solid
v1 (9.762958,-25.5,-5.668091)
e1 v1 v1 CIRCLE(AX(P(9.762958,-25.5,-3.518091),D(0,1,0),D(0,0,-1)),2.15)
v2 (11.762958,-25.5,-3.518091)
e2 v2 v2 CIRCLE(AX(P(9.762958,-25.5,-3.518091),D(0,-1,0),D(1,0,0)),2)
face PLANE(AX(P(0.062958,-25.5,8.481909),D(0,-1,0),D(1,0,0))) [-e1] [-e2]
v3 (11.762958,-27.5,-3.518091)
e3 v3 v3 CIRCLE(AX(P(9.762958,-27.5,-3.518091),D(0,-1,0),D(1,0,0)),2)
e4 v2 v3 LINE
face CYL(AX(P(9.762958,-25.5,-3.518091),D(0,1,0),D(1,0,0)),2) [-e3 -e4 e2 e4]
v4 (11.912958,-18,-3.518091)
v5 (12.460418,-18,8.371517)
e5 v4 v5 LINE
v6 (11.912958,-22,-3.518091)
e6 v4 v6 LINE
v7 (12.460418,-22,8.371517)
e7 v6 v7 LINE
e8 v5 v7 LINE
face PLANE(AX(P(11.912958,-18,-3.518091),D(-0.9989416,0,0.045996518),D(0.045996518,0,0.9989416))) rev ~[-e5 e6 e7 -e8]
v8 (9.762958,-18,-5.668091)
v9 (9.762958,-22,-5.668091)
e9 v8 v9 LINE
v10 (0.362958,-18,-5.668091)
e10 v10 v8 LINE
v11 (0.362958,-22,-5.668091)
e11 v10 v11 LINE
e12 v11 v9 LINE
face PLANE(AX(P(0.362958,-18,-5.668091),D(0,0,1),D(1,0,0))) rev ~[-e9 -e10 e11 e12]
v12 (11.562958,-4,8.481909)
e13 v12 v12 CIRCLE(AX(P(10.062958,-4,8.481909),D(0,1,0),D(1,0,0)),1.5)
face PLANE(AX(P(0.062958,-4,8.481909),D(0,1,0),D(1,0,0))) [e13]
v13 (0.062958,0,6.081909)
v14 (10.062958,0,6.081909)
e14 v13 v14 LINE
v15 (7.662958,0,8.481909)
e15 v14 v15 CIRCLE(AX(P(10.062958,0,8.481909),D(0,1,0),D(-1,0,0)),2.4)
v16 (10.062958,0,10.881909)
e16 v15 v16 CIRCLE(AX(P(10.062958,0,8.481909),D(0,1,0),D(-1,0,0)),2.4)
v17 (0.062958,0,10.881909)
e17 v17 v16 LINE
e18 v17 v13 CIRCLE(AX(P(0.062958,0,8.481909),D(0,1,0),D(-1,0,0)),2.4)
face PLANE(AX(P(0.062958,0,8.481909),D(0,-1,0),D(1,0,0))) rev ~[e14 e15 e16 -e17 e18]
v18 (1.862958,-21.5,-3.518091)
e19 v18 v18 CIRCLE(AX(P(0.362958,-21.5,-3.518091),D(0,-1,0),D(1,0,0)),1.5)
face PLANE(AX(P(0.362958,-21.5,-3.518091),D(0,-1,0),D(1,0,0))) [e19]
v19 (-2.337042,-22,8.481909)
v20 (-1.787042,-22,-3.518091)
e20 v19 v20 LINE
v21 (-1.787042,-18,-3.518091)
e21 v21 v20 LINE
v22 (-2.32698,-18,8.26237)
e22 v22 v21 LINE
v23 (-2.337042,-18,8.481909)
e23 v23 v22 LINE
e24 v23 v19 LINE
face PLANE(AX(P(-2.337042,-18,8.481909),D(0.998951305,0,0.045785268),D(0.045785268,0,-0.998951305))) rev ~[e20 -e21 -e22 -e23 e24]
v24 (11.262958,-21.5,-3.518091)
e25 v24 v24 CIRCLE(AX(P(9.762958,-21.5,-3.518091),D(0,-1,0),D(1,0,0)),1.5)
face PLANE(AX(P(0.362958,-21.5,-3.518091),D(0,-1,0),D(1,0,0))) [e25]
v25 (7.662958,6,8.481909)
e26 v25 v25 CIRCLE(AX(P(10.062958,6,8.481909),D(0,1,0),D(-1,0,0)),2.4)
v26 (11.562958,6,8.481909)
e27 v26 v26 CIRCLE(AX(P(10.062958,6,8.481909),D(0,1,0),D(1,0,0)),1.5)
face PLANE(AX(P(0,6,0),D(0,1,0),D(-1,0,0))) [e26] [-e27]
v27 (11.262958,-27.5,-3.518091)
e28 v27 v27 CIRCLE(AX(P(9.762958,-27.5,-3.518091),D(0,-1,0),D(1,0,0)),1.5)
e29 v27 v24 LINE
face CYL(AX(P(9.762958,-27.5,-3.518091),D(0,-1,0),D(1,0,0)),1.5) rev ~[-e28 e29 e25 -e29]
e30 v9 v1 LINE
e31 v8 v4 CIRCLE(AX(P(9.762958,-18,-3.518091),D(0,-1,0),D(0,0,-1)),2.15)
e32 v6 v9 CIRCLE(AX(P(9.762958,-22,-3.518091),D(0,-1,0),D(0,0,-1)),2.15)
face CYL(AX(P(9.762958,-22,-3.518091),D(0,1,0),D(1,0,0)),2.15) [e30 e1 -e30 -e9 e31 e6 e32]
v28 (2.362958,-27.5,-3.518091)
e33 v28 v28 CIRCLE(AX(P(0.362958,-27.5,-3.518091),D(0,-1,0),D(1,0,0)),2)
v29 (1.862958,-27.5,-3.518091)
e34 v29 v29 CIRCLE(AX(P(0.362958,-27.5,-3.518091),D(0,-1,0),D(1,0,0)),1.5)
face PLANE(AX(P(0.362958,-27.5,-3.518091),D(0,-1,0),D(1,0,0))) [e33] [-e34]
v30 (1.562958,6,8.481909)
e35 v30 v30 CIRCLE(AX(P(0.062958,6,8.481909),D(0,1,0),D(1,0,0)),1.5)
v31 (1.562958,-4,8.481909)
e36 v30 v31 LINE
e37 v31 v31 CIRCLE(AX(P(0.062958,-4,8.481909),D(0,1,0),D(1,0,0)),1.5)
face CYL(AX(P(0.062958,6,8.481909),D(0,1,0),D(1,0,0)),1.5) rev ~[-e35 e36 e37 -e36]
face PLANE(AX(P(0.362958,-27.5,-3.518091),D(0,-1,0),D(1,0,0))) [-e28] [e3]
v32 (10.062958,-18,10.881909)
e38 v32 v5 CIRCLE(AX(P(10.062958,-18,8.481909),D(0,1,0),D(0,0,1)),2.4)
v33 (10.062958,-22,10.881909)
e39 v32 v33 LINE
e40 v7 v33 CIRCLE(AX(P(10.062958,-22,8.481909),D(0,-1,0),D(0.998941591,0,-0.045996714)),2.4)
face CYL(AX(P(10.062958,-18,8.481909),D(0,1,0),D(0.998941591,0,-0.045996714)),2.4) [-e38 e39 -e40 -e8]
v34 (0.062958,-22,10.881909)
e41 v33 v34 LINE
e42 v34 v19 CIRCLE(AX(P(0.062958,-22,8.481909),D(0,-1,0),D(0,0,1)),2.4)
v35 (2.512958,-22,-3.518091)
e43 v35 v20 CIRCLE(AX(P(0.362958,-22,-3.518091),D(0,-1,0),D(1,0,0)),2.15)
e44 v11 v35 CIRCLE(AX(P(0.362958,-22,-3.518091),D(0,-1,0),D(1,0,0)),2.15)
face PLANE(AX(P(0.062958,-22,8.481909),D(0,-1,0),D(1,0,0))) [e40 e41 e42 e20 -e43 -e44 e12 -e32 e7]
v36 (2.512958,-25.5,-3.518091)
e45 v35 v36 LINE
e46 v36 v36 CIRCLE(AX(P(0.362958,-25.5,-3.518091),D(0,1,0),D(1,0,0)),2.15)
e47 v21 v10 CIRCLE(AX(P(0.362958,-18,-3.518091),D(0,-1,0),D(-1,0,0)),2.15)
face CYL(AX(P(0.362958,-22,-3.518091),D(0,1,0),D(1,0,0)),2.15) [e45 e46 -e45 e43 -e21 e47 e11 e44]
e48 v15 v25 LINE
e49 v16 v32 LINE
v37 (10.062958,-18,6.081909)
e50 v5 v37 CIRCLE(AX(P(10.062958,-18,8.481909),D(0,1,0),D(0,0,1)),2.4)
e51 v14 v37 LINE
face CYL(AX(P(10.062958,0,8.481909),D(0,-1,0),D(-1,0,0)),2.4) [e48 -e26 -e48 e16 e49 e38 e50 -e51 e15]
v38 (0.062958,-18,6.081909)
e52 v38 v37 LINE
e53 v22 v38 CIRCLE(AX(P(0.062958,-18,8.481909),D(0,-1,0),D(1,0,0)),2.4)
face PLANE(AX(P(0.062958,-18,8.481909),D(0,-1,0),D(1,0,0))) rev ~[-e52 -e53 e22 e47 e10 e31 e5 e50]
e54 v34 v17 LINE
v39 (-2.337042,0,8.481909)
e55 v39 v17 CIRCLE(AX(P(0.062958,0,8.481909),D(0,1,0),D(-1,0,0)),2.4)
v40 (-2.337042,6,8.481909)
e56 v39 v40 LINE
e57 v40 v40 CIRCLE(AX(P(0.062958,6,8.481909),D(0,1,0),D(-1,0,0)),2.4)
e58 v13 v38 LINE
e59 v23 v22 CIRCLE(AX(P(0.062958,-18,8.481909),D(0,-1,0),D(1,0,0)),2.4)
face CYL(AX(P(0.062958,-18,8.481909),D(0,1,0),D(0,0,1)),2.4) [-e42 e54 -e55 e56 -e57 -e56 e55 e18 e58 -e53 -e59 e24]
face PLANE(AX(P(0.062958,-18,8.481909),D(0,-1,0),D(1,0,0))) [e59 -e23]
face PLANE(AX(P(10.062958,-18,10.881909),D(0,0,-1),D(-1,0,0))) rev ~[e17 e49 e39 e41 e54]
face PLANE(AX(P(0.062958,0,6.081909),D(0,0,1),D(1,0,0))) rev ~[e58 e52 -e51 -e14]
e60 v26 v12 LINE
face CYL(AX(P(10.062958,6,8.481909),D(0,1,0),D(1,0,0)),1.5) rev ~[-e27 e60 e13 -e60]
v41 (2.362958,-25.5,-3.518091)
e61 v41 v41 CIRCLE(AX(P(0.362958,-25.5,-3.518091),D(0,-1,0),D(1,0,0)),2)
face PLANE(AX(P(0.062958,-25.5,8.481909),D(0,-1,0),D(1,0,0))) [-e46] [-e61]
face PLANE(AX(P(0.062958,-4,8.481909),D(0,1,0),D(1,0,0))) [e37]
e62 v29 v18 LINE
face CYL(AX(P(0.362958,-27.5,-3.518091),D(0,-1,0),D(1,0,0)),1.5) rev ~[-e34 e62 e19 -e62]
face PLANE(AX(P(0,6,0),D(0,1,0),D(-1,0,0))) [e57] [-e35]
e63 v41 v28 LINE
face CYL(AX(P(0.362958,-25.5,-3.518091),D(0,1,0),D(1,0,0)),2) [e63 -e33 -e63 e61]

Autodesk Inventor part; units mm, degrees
ref_plane "YZ Plane" through (0, 0, 0) normal (1, 0, 0) x (0, 1, 0)
ref_plane "XZ Plane" through (0, 0, 0) normal (0, 1, 0) x (-1, 0, 0)
ref_plane "XY Plane" through (0, 0, 0) normal (0, 0, 1) x (1, 0, 0)
sketch "Sketch1" plane through (0, 0, 0) normal (0, 1, 0) x (-1, 0, 0)
  circle A0 centre (-0.062958, 8.481909) radius 2.4
  circle A1 centre (-0.362958, -3.518091) radius 2.15
  circle A2 centre (-10.062958, 8.481909) radius 2.4
  circle A3 centre (-9.762958, -3.518091) radius 2.15
  point P0 (0, 0)
  dimension "d0" = 4.8
  dimension "d1" = 4.3
  dimension "d3" = 4.8
  dimension "d5" = 4.3
  dimension "d24" = 10
  dimension "d25" = 0.3
  dimension "d26" = 0.3
extrude "Extrusion1" add sketch "Sketch1" along normal blind 6 contours A0 | A2
sketch "Sketch2" plane through (0.062958, 0, 8.481909) normal (0, -1, 0) x (1, 0, 0)
  circle A0 centre (0.3, -12) radius 2.15
  circle A1 centre (9.7, -12) radius 2.15
  circle A2 centre (10, 0) radius 2.4
  circle A3 centre (0, 0) radius 2.4
  line L0 (-2.4, 0) -> (-1.85, -12)
  line L1 (0.3, -14.15) -> (9.7, -14.15)
  line L2 (11.85, -12) -> (12.39746, -0.110392)
  line L3 (0, 2.4) -> (10, 2.4)
  point P0 (-0.062958, -8.481909)
sketch "Sketch3" plane through (0.062958, 0, 8.481909) normal (0, -1, 0) x (1, 0, 0)
  circle A0 centre (10, 0) radius 2.4
  circle A1 centre (0, 0) radius 2.4
  line L0 (0, -2.4) -> (10, -2.4)
  line L1 (0, -2.4) -> (10, -2.4)
  circle A2 centre (0, 0) radius 2.4
  circle A3 centre (10, 0) radius 2.4
  circle A4 centre (10, 0) radius 2.4
  circle A5 centre (0, 0) radius 2.4
  circle A6 centre (0, 0) radius 2.4
  circle A7 centre (0, 0) radius 2.4
  circle A8 centre (0, 0) radius 2.4
  circle A9 centre (10, 0) radius 2.4
  circle A10 centre (10, 0) radius 2.4
  circle A11 centre (10, 0) radius 2.4
  circle A12 centre (10, 0) radius 2.4
  circle A13 centre (0, 0) radius 2.4
  circle A14 centre (10, 0) radius 2.4
  circle A15 centre (10, 0) radius 2.4
  circle A16 centre (0, 0) radius 2.4
  line L2 (0, 2.4) -> (10, 2.4)
  point P0 (-0.062958, -8.481909)
  point P1 (-2.4, 0)
  point P2 (12.39746, -0.110392)
extrude "Extrusion2" add sketch "Sketch3" along normal blind 18
sketch "Sketch4" plane through (0.062958, -18, 8.481909) normal (0, -1, 0) x (1, 0, 0)
  circle A0 centre (0.3, -12) radius 2.15
  circle A1 centre (9.7, -12) radius 2.15
  circle A2 centre (0, 0) radius 2.4
  circle A3 centre (10, 0) radius 2.4
  arc A4 (0, -2.4) -> (0, 2.4) centre (0, 0) ccw
  arc A5 (10, 2.4) -> (10, -2.4) centre (10, 0) ccw
  arc A6 (0, 2.4) -> (0, -2.4) centre (0, 0) ccw
  arc A7 (10, -2.4) -> (10, 2.4) centre (10, 0) ccw
  line L0 (0, -2.4) -> (10, -2.4)
  line L1 (0, -2.4) -> (10, -2.4)
  line L2 (10, 2.4) -> (0, 2.4)
  line L3 (10, 2.4) -> (0, 2.4)
  circle A8 centre (0, 0) radius 2.4
  arc A9 (0, -2.4) -> (0, 2.4) centre (0, 0) ccw
  arc A10 (0, 2.4) -> (0, -2.4) centre (0, 0) ccw
  circle A11 centre (10, 0) radius 2.4
  arc A12 (10, 2.4) -> (10, -2.4) centre (10, 0) ccw
  arc A13 (10, -2.4) -> (10, 2.4) centre (10, 0) ccw
  arc A14 (10, 2.4) -> (10, -2.4) centre (10, 0) ccw
  line L4 (0, -2.4) -> (10, -2.4)
  arc A15 (0, -2.4) -> (0, 2.4) centre (0, 0) ccw
  line L5 (10, 2.4) -> (0, 2.4)
  line L6 (0, -2.4) -> (10, -2.4)
  arc A16 (10, -2.4) -> (10, 2.4) centre (10, 0) ccw
  line L7 (10, 2.4) -> (0, 2.4)
  arc A17 (0, 2.4) -> (0, -2.4) centre (0, 0) ccw
  line L8 (0, -2.4) -> (10, -2.4)
  line L9 (0, -2.4) -> (10, -2.4)
  line L10 (10, 2.4) -> (0, 2.4)
  line L11 (10, 2.4) -> (0, 2.4)
  circle A18 centre (0, 0) radius 2.4
  circle A19 centre (10, 0) radius 2.4
  circle A20 centre (0, 0) radius 2.4
  circle A21 centre (10, 0) radius 2.4
  circle A22 centre (0.3, -12) radius 2.15
  circle A23 centre (9.7, -12) radius 2.15
  circle A24 centre (10, 0) radius 2.4
  circle A25 centre (0, 0) radius 2.4
  line L12 (-2.4, 0) -> (-1.85, -12)
  line L13 (0.3, -14.15) -> (9.7, -14.15)
  line L14 (11.85, -12) -> (12.39746, -0.110392)
  line L15 (0, 2.4) -> (10, 2.4)
  point P0 (-0.062958, -8.481909)
  point P1 (-0.062958, -8.481909)
  point P2 (-0.062958, -8.481909)
sketch "Sketch4 outline for Extrusion3" plane through (0.062958, -18, 8.481909) normal (0, -1, 0) x (1, 0, 0)
  line L0 (-2.4, 0) -> (-1.85, -12)
  arc A0 (0, 2.4) -> (-2.4, 0) centre (0, 0) ccw
  line L1 (10, 2.4) -> (0, 2.4)
  arc A1 (12.39746, -0.110392) -> (10, 2.4) centre (10, 0) ccw
  line L2 (11.85, -12) -> (12.39746, -0.110392)
  arc A2 (9.7, -14.15) -> (11.85, -12) centre (9.7, -12) ccw
  line L3 (0.3, -14.15) -> (9.7, -14.15)
  arc A3 (-1.85, -12) -> (0.3, -14.15) centre (0.3, -12) ccw
extrude "Extrusion3" add sketch "Sketch4 outline for Extrusion3" along normal blind 4
sketch "Sketch5" plane through (0.062958, -22, 8.481909) normal (0, -1, 0) x (1, 0, 0)
  arc A0 (-1.85, -12) -> (0.3, -14.15) centre (0.3, -12) ccw projected
  circle A1 centre (0.3, -12) radius 2.15
  arc A2 (9.7, -14.15) -> (11.85, -12) centre (9.7, -12) ccw projected
  circle A3 centre (9.7, -12) radius 2.15
  point P0 (-0.062958, -8.481909)
  point P1 (0.3, -14.15)
extrude "Extrusion4" add sketch "Sketch5" along normal blind 3.5
sketch "Sketch6" plane through (0.362958, -25.5, -3.518091) normal (0, -1, 0) x (1, 0, 0)
  arc A0 (0, -2.15) -> (-2.15, 0) centre (0, 0) ccw projected
  circle A1 centre (0, 0) radius 2
  arc A2 (11.55, 0) -> (9.4, -2.15) centre (9.4, 0) ccw projected
  circle A3 centre (9.4, 0) radius 2
  point P0 (-0.362958, 3.518091)
  dimension "d15" = 4
  dimension "d16" = 4
extrude "Extrusion5" add sketch "Sketch6" along normal blind 2
sketch "Sketch7" plane through (0.362958, -27.5, -3.518091) normal (0, -1, 0) x (1, 0, 0)
  circle A0 centre (0, 0) radius 1.5
  circle A1 centre (9.4, 0) radius 2 projected
  circle A2 centre (9.4, 0) radius 1.5
  point P0 (-0.362958, 3.518091)
  dimension "d19" = 3
  dimension "d20" = 3
extrude "Extrusion6" cut sketch "Sketch7" against normal blind 6 contours A0 | A2
sketch "Sketch8" plane through (0.062958, 6, 8.481909) normal (0, 1, 0) x (1, 0, 0)
  circle A0 centre (0, 0) radius 1.5
  circle A1 centre (10, 0) radius 2.4 projected
  circle A2 centre (10, 0) radius 1.5
  point P0 (-0.062958, 8.481909)
  dimension "d27" = 3
  dimension "d28" = 3
extrude "Extrusion7" cut sketch "Sketch8" against normal blind 10 contours A0 | A2
properties part number "gripper3rightsideservoholder_3DPrint"
